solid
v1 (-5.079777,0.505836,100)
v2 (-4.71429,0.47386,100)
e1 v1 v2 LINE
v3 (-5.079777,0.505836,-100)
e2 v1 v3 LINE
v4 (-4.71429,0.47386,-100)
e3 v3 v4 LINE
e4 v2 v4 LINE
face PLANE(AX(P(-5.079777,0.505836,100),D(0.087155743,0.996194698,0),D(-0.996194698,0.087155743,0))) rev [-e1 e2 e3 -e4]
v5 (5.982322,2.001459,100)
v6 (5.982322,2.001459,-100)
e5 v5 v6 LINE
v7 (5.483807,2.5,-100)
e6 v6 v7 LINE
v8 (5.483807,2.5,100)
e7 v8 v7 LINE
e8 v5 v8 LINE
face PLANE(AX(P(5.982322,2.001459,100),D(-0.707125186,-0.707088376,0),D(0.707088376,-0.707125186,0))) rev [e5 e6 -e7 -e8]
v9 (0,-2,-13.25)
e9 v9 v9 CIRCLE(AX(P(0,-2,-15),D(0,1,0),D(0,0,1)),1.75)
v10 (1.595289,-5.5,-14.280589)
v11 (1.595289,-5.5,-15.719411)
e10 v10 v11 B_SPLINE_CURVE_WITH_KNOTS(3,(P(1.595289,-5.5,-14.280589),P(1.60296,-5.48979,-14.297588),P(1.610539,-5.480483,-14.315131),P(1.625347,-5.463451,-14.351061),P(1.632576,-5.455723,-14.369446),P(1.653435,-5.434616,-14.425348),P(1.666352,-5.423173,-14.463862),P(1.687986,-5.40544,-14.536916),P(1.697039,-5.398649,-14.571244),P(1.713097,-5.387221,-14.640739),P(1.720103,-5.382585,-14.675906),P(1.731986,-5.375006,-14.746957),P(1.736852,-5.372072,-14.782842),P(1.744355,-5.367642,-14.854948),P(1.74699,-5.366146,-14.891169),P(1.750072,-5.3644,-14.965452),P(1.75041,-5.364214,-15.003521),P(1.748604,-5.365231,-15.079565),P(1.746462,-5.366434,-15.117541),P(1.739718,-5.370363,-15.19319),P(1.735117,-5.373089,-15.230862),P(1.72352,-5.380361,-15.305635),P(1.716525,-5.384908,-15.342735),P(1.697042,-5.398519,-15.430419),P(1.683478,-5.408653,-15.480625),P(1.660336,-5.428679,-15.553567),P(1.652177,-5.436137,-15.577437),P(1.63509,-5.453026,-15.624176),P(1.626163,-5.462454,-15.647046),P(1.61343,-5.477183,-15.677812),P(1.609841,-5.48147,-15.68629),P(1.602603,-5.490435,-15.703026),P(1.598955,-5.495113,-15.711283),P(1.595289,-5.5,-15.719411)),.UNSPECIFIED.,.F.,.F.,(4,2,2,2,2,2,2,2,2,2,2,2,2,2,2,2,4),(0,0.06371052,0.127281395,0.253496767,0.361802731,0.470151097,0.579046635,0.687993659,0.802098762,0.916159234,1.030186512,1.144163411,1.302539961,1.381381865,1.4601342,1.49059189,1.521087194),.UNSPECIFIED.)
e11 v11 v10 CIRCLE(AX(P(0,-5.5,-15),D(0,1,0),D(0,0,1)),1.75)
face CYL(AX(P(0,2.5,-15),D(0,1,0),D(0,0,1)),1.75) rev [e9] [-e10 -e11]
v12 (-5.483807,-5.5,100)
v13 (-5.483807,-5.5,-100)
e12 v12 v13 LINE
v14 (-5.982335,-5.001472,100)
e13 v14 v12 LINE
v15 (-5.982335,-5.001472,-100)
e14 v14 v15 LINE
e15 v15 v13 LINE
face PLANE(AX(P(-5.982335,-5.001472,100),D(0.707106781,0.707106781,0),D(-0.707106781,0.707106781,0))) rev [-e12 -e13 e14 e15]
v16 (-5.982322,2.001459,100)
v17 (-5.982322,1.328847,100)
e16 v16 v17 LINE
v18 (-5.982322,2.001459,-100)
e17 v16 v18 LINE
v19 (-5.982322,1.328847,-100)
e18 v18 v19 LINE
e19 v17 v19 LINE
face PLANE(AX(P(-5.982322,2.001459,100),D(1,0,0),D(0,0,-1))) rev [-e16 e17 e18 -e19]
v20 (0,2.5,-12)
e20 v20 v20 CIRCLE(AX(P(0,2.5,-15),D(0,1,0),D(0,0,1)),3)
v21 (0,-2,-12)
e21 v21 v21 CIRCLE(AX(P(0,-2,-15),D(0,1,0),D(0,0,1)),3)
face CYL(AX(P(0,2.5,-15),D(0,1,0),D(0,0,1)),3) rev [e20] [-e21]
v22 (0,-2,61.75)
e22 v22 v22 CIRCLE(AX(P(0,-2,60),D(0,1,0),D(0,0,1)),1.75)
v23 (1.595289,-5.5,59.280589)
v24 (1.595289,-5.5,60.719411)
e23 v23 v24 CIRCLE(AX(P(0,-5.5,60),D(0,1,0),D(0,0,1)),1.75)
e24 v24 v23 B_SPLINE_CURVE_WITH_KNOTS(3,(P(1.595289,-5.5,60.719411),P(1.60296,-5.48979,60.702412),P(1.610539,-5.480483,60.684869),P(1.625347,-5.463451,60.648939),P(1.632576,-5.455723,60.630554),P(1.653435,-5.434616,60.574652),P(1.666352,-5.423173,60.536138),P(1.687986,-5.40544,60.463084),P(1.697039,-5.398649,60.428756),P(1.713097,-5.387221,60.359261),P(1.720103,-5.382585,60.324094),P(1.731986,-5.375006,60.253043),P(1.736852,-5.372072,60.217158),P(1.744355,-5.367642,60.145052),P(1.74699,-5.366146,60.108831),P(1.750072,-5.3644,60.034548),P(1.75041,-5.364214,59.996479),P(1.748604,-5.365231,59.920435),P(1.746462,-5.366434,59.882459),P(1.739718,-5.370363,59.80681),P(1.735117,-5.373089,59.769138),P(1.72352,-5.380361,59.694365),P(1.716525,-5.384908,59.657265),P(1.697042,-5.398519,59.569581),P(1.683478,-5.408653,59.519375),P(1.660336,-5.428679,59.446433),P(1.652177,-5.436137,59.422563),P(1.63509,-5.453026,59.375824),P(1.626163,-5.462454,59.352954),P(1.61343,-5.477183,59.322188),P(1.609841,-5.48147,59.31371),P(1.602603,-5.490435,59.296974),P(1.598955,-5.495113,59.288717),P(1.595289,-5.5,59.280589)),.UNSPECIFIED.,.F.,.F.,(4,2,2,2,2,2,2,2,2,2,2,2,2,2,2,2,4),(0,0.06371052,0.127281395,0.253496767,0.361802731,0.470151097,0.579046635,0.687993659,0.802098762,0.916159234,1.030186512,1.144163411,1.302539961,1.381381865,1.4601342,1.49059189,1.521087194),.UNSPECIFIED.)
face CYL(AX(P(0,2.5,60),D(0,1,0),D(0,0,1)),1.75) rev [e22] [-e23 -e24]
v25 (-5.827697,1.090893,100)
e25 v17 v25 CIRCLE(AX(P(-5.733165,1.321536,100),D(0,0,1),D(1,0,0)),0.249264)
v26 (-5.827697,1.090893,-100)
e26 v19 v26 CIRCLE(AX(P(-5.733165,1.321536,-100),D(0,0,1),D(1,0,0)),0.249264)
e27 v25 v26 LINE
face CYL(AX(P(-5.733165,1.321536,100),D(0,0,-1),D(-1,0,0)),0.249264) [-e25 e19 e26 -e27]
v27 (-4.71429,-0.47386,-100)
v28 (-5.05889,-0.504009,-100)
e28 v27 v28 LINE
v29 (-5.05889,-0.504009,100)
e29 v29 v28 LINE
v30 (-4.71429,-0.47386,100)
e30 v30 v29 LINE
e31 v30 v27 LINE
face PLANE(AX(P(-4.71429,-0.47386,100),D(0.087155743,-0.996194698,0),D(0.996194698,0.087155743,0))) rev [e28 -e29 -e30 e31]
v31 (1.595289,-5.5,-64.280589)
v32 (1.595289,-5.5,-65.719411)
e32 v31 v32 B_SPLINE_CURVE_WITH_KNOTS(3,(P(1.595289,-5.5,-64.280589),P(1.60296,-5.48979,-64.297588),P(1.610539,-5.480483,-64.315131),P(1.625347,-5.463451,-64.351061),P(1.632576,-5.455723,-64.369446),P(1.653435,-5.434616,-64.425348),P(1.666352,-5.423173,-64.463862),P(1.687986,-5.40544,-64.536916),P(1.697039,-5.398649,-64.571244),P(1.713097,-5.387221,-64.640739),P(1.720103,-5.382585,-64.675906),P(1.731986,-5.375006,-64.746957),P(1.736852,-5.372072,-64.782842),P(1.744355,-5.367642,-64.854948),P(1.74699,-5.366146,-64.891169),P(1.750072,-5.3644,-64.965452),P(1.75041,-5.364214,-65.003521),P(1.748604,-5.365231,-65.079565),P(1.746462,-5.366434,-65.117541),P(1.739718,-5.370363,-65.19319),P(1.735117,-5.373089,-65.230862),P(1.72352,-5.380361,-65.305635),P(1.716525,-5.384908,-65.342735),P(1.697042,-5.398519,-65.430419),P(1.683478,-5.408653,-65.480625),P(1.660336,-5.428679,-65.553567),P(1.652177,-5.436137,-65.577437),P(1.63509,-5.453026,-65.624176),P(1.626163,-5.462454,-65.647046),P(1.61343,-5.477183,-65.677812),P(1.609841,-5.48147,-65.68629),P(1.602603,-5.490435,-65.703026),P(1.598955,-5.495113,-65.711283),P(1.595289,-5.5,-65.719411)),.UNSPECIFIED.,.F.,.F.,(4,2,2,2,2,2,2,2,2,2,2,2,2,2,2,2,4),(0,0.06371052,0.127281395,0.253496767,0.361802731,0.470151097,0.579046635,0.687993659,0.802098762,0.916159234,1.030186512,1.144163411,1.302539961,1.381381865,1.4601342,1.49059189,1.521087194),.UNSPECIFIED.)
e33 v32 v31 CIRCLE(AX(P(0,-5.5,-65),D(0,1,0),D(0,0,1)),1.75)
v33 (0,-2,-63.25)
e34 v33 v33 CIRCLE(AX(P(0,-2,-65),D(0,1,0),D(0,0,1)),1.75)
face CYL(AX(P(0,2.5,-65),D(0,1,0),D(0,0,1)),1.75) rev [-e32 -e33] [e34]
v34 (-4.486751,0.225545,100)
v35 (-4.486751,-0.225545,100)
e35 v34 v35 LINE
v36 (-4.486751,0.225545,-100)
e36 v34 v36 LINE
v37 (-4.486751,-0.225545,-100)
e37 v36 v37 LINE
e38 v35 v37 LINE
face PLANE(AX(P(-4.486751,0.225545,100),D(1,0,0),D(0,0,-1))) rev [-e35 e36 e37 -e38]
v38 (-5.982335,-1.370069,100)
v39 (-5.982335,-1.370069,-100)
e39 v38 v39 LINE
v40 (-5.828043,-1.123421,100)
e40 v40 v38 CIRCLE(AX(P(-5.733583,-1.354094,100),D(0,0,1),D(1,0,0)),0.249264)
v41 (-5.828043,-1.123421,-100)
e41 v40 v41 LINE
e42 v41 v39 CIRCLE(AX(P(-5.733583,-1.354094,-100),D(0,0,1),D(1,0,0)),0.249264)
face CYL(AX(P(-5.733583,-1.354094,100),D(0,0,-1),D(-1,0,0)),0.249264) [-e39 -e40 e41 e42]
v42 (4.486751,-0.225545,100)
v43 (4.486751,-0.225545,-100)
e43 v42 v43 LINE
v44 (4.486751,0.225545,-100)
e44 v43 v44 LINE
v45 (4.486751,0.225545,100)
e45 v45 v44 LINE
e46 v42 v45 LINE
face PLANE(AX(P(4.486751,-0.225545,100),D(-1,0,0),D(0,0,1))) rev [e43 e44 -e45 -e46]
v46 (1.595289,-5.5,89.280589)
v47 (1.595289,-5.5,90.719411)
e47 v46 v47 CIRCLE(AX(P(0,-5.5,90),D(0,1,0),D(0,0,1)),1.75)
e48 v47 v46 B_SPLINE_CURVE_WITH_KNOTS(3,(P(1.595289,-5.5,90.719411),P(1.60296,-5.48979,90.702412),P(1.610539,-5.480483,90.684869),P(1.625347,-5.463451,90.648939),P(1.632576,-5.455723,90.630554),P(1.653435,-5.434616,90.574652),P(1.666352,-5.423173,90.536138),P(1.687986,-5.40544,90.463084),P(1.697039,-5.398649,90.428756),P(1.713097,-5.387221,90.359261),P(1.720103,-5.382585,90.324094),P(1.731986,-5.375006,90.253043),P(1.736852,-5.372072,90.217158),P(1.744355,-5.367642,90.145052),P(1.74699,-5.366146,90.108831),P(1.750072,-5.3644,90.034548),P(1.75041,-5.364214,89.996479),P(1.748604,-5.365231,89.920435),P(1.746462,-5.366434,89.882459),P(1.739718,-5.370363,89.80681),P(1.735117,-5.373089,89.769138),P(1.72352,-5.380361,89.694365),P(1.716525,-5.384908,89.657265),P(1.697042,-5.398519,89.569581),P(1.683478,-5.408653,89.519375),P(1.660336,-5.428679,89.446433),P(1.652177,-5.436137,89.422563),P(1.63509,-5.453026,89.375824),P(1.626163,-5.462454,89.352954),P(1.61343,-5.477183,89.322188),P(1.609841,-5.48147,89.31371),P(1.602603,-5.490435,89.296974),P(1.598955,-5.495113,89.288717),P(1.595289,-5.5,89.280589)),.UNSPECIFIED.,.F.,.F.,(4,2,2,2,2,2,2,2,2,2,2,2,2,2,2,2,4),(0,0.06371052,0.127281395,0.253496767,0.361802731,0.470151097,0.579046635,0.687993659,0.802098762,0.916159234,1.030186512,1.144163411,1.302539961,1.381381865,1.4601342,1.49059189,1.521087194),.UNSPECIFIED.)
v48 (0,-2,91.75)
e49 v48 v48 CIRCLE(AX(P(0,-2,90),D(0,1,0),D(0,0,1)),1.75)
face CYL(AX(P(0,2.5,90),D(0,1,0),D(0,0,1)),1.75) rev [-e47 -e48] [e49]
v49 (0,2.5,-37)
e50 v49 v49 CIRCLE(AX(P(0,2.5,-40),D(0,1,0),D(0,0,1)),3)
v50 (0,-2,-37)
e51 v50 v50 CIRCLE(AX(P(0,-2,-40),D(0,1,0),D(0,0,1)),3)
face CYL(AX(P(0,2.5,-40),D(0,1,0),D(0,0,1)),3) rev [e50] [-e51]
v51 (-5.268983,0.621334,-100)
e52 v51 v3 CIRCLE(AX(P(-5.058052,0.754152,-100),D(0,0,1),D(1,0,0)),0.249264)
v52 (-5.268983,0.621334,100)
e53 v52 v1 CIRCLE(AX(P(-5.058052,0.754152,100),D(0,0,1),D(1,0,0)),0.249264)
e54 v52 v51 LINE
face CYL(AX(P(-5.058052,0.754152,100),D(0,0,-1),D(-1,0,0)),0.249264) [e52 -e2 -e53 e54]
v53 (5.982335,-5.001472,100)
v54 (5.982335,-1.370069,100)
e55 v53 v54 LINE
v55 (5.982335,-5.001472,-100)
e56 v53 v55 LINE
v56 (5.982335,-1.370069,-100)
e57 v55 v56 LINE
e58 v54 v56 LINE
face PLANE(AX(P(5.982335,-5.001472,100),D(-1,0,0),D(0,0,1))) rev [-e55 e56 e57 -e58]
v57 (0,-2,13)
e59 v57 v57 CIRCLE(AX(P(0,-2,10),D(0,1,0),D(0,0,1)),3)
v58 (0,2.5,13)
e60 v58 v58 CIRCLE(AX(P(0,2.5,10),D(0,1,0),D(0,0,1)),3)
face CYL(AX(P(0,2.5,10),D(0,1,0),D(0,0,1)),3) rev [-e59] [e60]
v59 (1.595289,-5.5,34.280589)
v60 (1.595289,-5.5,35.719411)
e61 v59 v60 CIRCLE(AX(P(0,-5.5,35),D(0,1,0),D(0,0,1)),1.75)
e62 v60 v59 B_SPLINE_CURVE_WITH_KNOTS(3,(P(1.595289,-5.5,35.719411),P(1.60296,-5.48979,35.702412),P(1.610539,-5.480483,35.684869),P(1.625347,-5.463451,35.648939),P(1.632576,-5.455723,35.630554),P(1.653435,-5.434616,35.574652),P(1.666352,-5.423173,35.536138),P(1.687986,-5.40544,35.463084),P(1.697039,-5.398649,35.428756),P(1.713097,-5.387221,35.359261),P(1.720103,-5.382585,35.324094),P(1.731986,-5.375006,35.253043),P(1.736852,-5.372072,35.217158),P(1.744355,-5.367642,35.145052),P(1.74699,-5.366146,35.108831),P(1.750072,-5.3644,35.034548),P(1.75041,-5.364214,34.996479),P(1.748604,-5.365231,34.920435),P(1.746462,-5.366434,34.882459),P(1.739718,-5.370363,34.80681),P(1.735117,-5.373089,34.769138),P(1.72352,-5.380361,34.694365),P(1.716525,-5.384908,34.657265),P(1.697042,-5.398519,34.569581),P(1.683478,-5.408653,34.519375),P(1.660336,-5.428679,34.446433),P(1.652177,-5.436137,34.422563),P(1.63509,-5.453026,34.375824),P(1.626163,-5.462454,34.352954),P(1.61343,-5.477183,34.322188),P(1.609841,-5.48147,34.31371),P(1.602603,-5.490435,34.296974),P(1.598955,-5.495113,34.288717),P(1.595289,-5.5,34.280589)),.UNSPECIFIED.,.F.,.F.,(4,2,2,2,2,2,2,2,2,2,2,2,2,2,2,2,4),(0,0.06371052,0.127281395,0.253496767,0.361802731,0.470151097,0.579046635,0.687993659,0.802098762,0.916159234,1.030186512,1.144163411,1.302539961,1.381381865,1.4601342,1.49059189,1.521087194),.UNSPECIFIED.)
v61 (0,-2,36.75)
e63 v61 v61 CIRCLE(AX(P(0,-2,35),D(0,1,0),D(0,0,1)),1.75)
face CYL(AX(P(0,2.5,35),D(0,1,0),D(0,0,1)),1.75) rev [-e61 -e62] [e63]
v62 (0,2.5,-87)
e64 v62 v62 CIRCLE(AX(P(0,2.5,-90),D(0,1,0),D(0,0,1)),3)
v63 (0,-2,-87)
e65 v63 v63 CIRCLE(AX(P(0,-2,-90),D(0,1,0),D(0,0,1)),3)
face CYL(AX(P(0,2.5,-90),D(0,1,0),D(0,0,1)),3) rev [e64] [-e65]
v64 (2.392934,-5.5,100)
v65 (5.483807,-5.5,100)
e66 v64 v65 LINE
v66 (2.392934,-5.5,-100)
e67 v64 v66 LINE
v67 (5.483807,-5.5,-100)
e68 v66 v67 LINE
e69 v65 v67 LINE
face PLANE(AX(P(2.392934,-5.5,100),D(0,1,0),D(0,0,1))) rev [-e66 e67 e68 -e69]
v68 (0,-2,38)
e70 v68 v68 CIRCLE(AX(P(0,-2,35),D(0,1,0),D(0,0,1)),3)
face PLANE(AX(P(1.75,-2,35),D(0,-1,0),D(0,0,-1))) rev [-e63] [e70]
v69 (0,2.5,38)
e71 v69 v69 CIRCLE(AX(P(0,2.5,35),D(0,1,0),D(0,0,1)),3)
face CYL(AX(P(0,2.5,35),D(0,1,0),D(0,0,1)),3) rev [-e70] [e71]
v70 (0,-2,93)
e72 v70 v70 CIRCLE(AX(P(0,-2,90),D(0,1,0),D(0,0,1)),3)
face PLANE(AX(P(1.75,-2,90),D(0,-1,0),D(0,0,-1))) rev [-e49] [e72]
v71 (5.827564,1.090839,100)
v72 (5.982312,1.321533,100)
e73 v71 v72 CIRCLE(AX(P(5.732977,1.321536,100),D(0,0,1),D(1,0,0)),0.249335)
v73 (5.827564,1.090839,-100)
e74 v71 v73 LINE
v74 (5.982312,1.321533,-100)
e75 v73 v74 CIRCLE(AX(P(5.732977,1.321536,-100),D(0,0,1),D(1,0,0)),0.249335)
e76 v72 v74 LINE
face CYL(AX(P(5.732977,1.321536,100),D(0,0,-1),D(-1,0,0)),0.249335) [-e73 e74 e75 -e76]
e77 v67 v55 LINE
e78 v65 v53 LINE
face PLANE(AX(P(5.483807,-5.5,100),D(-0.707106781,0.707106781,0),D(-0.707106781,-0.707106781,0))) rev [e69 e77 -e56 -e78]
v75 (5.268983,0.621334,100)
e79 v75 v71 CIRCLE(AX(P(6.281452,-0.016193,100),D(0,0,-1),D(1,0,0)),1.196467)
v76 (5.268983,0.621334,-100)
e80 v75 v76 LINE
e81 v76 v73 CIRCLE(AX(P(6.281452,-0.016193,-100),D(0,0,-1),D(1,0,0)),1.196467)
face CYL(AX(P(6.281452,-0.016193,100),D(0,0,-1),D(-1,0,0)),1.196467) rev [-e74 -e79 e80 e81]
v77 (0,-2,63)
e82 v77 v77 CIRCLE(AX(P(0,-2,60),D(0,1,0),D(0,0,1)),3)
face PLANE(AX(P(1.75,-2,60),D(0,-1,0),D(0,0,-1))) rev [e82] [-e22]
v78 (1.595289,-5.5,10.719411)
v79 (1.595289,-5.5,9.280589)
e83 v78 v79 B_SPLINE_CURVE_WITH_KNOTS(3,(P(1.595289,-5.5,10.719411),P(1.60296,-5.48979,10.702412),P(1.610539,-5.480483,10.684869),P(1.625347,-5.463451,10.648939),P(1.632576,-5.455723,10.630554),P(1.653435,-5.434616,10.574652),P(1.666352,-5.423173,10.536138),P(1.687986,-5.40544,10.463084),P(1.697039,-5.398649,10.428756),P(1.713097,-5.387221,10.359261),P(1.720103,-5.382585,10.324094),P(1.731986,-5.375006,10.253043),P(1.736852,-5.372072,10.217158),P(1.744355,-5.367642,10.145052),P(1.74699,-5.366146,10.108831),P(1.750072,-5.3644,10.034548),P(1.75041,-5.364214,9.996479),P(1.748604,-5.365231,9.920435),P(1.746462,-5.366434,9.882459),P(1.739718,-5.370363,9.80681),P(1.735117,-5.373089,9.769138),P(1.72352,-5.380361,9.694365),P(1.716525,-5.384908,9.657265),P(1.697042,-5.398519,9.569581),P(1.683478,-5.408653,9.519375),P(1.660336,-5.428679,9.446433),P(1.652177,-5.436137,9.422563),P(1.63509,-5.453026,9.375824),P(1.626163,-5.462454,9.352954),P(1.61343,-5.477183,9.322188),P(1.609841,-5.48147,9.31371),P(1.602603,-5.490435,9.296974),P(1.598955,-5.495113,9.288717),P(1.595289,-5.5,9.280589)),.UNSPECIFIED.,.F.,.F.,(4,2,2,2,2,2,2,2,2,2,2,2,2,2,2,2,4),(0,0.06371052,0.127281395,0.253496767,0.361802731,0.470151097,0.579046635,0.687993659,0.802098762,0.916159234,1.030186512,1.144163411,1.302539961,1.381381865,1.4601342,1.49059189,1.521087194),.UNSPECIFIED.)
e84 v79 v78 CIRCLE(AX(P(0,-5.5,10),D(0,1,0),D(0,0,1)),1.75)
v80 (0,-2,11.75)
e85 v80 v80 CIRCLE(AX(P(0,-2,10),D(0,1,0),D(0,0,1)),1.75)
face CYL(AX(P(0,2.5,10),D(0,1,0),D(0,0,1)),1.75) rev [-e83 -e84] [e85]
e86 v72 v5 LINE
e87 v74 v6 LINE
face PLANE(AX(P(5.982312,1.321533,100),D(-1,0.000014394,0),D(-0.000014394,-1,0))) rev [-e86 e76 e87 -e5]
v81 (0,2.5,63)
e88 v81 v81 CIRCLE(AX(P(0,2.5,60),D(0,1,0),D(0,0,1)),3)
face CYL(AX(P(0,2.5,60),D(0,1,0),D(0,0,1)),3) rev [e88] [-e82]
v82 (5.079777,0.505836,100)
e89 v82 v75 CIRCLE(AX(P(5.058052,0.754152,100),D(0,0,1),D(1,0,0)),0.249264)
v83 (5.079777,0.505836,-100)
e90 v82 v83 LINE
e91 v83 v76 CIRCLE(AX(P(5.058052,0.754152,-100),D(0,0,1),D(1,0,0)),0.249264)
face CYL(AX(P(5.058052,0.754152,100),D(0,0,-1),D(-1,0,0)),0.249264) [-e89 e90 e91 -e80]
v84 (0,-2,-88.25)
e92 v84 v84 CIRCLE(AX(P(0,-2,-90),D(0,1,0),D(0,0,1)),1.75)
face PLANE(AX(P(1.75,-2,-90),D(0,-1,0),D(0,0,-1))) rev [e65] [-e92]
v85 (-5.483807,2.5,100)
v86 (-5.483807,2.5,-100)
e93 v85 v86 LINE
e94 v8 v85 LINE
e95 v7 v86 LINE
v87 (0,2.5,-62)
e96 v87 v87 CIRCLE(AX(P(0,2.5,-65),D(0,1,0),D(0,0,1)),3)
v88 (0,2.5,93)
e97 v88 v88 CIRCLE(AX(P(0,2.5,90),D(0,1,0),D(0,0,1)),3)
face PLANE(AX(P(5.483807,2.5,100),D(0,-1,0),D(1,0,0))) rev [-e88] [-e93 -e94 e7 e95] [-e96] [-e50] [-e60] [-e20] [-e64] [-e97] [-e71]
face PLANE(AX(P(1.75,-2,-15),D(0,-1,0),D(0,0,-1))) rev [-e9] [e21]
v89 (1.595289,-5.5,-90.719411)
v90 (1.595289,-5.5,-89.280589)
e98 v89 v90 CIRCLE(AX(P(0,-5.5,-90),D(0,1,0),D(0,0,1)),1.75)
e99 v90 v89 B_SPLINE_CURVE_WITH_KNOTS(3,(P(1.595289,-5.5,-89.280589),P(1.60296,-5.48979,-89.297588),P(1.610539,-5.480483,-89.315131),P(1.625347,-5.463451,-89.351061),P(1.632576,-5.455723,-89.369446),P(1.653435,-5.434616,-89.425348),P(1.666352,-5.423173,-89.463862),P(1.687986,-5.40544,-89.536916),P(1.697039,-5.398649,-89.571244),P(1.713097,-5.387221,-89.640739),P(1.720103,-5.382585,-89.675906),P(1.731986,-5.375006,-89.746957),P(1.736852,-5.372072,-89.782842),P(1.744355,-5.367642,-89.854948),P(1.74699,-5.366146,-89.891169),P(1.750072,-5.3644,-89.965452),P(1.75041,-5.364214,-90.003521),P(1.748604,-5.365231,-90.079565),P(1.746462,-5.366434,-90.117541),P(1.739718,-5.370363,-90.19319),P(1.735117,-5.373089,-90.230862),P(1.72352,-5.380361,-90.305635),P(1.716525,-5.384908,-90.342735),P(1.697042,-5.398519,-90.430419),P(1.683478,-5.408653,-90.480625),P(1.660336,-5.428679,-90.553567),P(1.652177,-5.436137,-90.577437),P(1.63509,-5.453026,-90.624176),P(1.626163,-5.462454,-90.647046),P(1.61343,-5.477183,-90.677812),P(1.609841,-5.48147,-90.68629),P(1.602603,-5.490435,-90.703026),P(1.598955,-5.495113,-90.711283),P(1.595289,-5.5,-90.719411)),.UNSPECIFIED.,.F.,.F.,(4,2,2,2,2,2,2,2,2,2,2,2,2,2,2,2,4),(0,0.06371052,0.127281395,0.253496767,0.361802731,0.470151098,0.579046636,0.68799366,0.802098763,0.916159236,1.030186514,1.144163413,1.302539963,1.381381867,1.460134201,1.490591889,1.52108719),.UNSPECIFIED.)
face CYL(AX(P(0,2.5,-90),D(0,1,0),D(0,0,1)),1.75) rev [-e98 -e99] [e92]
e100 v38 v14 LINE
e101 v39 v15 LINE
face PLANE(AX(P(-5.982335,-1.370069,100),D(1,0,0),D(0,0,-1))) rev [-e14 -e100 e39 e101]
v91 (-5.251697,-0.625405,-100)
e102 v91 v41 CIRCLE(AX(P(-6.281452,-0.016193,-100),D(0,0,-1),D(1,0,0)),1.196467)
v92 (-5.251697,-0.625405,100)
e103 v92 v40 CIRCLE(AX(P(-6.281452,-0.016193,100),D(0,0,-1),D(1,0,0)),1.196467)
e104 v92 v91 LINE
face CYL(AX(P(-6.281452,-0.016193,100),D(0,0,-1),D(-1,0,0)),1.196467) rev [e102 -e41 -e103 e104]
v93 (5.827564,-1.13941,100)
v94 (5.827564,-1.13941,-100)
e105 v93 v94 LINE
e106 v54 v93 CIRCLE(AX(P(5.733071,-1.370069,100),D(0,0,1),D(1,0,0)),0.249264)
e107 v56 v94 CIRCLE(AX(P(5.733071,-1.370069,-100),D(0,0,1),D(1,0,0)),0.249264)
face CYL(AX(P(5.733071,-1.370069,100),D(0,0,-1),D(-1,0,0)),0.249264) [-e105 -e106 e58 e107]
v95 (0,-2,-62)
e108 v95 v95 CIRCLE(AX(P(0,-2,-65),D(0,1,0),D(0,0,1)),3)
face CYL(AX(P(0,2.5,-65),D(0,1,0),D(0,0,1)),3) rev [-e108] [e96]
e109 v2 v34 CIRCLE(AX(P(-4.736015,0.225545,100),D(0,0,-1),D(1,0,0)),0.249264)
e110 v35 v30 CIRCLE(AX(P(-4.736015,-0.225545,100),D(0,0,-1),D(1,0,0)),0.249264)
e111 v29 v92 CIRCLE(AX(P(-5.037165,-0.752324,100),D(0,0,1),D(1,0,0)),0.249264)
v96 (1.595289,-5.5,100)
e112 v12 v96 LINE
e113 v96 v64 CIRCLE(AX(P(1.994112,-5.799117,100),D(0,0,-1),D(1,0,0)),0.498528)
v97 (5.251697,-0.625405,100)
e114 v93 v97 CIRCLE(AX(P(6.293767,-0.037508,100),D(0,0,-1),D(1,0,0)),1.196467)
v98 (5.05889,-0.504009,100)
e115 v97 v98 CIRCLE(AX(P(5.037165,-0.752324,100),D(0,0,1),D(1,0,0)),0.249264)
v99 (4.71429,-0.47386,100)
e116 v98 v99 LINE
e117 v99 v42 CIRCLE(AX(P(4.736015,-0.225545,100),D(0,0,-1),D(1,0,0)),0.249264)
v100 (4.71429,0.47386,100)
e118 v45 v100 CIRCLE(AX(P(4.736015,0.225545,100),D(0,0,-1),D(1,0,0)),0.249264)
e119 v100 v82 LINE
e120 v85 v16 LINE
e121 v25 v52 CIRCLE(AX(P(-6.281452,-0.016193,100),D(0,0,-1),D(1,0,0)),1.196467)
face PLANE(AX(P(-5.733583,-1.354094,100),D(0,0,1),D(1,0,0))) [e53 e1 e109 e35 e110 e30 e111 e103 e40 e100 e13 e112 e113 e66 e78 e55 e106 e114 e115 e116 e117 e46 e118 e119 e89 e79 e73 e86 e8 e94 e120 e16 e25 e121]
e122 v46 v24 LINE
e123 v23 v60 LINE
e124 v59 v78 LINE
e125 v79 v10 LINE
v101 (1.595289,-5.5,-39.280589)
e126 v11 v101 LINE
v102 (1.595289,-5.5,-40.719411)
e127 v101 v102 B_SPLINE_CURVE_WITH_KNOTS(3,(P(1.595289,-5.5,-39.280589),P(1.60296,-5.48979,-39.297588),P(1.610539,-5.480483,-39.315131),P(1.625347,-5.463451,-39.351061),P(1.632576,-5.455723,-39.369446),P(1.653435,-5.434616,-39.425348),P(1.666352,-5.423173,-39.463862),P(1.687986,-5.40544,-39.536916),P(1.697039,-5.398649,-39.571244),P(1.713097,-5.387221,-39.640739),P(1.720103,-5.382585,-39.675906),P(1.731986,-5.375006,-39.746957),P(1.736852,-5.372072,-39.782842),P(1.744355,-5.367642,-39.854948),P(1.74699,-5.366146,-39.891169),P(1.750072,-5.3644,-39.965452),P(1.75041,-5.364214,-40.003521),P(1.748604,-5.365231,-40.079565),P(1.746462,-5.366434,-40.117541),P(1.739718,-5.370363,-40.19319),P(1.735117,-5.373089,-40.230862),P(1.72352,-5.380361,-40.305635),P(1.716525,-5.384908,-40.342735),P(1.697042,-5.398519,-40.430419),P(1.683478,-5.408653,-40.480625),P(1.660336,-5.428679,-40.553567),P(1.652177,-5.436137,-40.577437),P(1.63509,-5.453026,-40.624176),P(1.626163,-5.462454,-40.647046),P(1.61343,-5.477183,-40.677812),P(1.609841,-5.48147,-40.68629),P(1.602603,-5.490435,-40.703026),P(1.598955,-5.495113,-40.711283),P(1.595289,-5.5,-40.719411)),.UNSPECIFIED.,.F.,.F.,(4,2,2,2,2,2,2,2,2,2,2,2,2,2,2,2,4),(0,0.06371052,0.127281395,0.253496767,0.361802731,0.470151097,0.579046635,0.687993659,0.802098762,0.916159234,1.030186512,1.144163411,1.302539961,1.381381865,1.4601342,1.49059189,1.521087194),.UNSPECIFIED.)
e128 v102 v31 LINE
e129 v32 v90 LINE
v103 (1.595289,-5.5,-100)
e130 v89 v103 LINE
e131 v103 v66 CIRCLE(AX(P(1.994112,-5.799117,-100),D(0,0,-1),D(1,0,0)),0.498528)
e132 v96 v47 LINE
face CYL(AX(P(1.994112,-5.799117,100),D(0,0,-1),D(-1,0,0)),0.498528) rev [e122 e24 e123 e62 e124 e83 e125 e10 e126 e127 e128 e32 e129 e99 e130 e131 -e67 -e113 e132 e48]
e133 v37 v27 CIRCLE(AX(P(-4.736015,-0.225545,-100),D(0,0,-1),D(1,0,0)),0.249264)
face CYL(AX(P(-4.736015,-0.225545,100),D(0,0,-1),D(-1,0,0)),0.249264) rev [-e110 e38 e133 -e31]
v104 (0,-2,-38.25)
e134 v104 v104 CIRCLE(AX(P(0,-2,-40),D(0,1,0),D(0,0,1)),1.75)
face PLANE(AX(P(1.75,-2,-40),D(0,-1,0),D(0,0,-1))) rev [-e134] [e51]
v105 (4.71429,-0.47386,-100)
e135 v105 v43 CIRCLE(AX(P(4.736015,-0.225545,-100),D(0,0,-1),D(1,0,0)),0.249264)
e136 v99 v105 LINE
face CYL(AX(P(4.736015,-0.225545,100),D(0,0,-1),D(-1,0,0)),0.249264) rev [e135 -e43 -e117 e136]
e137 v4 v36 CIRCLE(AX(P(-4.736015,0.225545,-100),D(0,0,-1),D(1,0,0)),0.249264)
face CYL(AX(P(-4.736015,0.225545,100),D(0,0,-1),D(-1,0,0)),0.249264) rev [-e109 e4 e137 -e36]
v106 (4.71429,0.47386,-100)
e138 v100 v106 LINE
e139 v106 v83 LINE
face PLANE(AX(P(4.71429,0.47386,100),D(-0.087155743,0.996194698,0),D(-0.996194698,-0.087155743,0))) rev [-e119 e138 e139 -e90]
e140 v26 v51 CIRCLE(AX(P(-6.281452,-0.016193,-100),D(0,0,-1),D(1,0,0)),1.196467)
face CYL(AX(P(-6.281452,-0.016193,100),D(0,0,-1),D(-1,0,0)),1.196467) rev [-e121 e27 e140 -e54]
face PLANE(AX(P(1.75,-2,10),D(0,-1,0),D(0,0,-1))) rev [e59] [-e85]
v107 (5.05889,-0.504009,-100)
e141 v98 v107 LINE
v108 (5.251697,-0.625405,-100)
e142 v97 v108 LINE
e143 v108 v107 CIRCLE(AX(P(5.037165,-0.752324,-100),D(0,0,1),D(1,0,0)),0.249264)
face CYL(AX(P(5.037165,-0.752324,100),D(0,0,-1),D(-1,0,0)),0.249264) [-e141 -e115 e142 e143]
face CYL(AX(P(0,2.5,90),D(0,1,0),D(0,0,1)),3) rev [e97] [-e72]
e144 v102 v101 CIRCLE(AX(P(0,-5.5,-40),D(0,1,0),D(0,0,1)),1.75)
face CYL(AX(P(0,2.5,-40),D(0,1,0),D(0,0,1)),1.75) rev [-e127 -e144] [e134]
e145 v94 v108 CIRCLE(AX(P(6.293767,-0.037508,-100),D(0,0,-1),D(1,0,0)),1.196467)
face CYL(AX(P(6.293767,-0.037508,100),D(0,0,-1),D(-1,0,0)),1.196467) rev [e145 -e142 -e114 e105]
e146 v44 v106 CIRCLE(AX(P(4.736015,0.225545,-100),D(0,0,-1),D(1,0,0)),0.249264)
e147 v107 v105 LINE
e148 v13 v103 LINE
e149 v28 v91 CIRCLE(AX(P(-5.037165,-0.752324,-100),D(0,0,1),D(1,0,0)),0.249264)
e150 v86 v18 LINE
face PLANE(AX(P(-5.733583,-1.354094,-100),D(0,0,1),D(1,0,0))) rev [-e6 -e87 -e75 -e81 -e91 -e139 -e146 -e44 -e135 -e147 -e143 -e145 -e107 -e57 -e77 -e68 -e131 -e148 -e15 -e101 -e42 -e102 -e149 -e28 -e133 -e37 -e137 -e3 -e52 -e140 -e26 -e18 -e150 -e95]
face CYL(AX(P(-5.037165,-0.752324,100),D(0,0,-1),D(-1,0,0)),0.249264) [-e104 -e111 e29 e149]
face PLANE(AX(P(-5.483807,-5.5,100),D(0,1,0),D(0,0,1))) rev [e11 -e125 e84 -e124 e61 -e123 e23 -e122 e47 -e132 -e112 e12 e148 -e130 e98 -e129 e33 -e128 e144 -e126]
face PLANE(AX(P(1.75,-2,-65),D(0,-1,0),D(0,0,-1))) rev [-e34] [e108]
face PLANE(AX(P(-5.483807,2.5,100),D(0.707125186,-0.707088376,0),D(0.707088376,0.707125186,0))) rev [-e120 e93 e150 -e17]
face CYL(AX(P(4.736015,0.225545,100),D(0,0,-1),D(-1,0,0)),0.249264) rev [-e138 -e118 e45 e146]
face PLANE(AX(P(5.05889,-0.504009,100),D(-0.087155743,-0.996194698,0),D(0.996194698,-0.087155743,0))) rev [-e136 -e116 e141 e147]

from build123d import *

# Parameters (mm, degrees)
RAIL_PROFILE_DEPTH             = 100
CBORE_FOR_M3_SHCS1_D           = 3.5
CBORE_FOR_M3_SHCS1_CBORE_D     = 6
CBORE_FOR_M3_SHCS1_CBORE_DEPTH = 4.5
FILL_START                     = -2.000000001
FILL_PATTERN1_OUTLINE_R        = 3
FILL_PATTERN1_DEPTH            = 4.5
FILL_START_2                   = -5.5
FILL_PATTERN1_2_OUTLINE_R      = 1.75
FILL_PATTERN1_2_DEPTH          = 3.499999999


# Read off the part's stored shape, not the designer's step: Fill Pattern1
with BuildPart() as part:
    # Sketch1 → RAIL PROFILE (new, symmetric)
    with BuildSketch(Plane.XY):
        with BuildLine():
            Line((-5.982334879, -1.370069213), (-5.982334879, -5.001472146))
            Line((-5.982334879, -5.001472146), (-5.483807025, -5.499999999))
            Line((-5.483807025, -5.499999999), (1.595289228, -5.499999999))
            ThreePointArc((1.595289228, -5.499999999), (1.994111552, -5.300588838), (2.392933875, -5.5))
            Line((2.392933875, -5.5), (5.483807024, -5.5))
            Line((5.483807024, -5.5), (5.982334878, -5.001472147))
            Line((5.982334878, -5.001472147), (5.982334878, -1.370069213))
            ThreePointArc((5.982334878, -1.370069213), (5.940056641, -1.231182813), (5.82756375, -1.139410101))
            ThreePointArc((5.82756375, -1.139410101), (5.497041405, -0.930122348), (5.251697363, -0.625405104))
            ThreePointArc((5.251697363, -0.625405104), (5.169975597, -0.541388466), (5.058890009, -0.504008866))
            Line((5.058890009, -0.504008866), (4.71429032, -0.473860299))
            ThreePointArc((4.71429032, -0.473860299), (4.552238438, -0.393945155), (4.486751147, -0.225544865))
            Line((4.486751147, -0.225544865), (4.486751147, 0.225544865))
            ThreePointArc((4.486751147, 0.225544865), (4.552238438, 0.393945155), (4.71429032, 0.473860299))
            Line((4.71429032, 0.473860299), (5.079776582, 0.505836204))
            ThreePointArc((5.079776582, 0.505836204), (5.187925163, 0.5413949), (5.268982803, 0.621333598))
            ThreePointArc((5.268982803, 0.621333598), (5.511607978, 0.899707672), (5.82756375, 1.09083865))
            ThreePointArc((5.82756375, 1.09083865), (5.940040963, 1.182638806), (5.982312115, 1.321532803))
            Line((5.982312115, 1.321532803), (5.982321902, 2.00145917))
            Line((5.982321902, 2.00145917), (5.483807025, 2.499999999))
            Line((5.483807025, 2.499999999), (-5.483807026, 2.499999999))
            Line((-5.483807026, 2.499999999), (-5.982321903, 2.00145917))
            Line((-5.982321903, 2.00145917), (-5.982321903, 1.32884687))
            ThreePointArc((-5.982321903, 1.32884687), (-5.942177076, 1.185718341), (-5.827697321, 1.090893402))
            ThreePointArc((-5.827697321, 1.090893402), (-5.511663234, 0.899754111), (-5.268982805, 0.621333597))
            ThreePointArc((-5.268982805, 0.621333597), (-5.187925164, 0.541394898), (-5.079776582, 0.505836204))
            Line((-5.079776582, 0.505836204), (-4.71429032, 0.473860299))
            ThreePointArc((-4.71429032, 0.473860299), (-4.552238438, 0.393945155), (-4.486751147, 0.225544865))
            Line((-4.486751147, 0.225544865), (-4.486751147, -0.225544865))
            ThreePointArc((-4.486751147, -0.225544865), (-4.552238438, -0.393945155), (-4.71429032, -0.473860299))
            Line((-4.71429032, -0.473860299), (-5.058890009, -0.504008866))
            ThreePointArc((-5.058890009, -0.504008866), (-5.169975597, -0.541388466), (-5.251697363, -0.625405104))
            ThreePointArc((-5.251697363, -0.625405104), (-5.499180752, -0.921502608), (-5.828043428, -1.123421157))
            ThreePointArc((-5.828043428, -1.123421157), (-5.944906256, -1.221900029), (-5.982334879, -1.370069213))
        make_face()
    extrude(amount=RAIL_PROFILE_DEPTH, both=True)

    # CBORE for M3 SHCS1 (through all)
    with Locations(Plane(origin=(0, 2.499999999, 0), x_dir=(1, 0, 0), z_dir=(0, 1, 0))):
        with Locations((0, 90)):
            cbore_for_m3_shcs1 = CounterBoreHole(CBORE_FOR_M3_SHCS1_D / 2, CBORE_FOR_M3_SHCS1_CBORE_D / 2, CBORE_FOR_M3_SHCS1_CBORE_DEPTH)

    # M3 END MIRROR: CBORE for M3 SHCS1 across plane
    add(cbore_for_m3_shcs1.mirror(Plane.XY), mode=Mode.SUBTRACT)

    # Fill Pattern1 outline → Fill Pattern1 (cut)
    with BuildSketch(Plane(origin=(0, 0, 0), x_dir=(1, 0, 0), z_dir=(0, 1, 0)).offset(FILL_START)):
        with Locations((0, 65)):
            Circle(FILL_PATTERN1_OUTLINE_R)
        with Locations((0, 40)):
            Circle(FILL_PATTERN1_OUTLINE_R)
        with Locations((0, 15)):
            Circle(FILL_PATTERN1_OUTLINE_R)
        with Locations((0, -10)):
            Circle(FILL_PATTERN1_OUTLINE_R)
        with Locations((0, -35)):
            Circle(FILL_PATTERN1_OUTLINE_R)
        with Locations((0, -60)):
            Circle(FILL_PATTERN1_OUTLINE_R)
    extrude(amount=FILL_PATTERN1_DEPTH, mode=Mode.SUBTRACT)

    # Fill Pattern1 2 outline → Fill Pattern1 2 (cut)
    with BuildSketch(Plane(origin=(0, 0, 0), x_dir=(1, 0, 0), z_dir=(0, 1, 0)).offset(FILL_START_2)):
        with Locations((0, 65)):
            Circle(FILL_PATTERN1_2_OUTLINE_R)
        with Locations((0, 40)):
            Circle(FILL_PATTERN1_2_OUTLINE_R)
        with Locations((0, 15)):
            Circle(FILL_PATTERN1_2_OUTLINE_R)
        with Locations((0, -10)):
            Circle(FILL_PATTERN1_2_OUTLINE_R)
        with Locations((0, -35)):
            Circle(FILL_PATTERN1_2_OUTLINE_R)
        with Locations((0, -60)):
            Circle(FILL_PATTERN1_2_OUTLINE_R)
    extrude(amount=FILL_PATTERN1_2_DEPTH, mode=Mode.SUBTRACT)


solid = part.part
